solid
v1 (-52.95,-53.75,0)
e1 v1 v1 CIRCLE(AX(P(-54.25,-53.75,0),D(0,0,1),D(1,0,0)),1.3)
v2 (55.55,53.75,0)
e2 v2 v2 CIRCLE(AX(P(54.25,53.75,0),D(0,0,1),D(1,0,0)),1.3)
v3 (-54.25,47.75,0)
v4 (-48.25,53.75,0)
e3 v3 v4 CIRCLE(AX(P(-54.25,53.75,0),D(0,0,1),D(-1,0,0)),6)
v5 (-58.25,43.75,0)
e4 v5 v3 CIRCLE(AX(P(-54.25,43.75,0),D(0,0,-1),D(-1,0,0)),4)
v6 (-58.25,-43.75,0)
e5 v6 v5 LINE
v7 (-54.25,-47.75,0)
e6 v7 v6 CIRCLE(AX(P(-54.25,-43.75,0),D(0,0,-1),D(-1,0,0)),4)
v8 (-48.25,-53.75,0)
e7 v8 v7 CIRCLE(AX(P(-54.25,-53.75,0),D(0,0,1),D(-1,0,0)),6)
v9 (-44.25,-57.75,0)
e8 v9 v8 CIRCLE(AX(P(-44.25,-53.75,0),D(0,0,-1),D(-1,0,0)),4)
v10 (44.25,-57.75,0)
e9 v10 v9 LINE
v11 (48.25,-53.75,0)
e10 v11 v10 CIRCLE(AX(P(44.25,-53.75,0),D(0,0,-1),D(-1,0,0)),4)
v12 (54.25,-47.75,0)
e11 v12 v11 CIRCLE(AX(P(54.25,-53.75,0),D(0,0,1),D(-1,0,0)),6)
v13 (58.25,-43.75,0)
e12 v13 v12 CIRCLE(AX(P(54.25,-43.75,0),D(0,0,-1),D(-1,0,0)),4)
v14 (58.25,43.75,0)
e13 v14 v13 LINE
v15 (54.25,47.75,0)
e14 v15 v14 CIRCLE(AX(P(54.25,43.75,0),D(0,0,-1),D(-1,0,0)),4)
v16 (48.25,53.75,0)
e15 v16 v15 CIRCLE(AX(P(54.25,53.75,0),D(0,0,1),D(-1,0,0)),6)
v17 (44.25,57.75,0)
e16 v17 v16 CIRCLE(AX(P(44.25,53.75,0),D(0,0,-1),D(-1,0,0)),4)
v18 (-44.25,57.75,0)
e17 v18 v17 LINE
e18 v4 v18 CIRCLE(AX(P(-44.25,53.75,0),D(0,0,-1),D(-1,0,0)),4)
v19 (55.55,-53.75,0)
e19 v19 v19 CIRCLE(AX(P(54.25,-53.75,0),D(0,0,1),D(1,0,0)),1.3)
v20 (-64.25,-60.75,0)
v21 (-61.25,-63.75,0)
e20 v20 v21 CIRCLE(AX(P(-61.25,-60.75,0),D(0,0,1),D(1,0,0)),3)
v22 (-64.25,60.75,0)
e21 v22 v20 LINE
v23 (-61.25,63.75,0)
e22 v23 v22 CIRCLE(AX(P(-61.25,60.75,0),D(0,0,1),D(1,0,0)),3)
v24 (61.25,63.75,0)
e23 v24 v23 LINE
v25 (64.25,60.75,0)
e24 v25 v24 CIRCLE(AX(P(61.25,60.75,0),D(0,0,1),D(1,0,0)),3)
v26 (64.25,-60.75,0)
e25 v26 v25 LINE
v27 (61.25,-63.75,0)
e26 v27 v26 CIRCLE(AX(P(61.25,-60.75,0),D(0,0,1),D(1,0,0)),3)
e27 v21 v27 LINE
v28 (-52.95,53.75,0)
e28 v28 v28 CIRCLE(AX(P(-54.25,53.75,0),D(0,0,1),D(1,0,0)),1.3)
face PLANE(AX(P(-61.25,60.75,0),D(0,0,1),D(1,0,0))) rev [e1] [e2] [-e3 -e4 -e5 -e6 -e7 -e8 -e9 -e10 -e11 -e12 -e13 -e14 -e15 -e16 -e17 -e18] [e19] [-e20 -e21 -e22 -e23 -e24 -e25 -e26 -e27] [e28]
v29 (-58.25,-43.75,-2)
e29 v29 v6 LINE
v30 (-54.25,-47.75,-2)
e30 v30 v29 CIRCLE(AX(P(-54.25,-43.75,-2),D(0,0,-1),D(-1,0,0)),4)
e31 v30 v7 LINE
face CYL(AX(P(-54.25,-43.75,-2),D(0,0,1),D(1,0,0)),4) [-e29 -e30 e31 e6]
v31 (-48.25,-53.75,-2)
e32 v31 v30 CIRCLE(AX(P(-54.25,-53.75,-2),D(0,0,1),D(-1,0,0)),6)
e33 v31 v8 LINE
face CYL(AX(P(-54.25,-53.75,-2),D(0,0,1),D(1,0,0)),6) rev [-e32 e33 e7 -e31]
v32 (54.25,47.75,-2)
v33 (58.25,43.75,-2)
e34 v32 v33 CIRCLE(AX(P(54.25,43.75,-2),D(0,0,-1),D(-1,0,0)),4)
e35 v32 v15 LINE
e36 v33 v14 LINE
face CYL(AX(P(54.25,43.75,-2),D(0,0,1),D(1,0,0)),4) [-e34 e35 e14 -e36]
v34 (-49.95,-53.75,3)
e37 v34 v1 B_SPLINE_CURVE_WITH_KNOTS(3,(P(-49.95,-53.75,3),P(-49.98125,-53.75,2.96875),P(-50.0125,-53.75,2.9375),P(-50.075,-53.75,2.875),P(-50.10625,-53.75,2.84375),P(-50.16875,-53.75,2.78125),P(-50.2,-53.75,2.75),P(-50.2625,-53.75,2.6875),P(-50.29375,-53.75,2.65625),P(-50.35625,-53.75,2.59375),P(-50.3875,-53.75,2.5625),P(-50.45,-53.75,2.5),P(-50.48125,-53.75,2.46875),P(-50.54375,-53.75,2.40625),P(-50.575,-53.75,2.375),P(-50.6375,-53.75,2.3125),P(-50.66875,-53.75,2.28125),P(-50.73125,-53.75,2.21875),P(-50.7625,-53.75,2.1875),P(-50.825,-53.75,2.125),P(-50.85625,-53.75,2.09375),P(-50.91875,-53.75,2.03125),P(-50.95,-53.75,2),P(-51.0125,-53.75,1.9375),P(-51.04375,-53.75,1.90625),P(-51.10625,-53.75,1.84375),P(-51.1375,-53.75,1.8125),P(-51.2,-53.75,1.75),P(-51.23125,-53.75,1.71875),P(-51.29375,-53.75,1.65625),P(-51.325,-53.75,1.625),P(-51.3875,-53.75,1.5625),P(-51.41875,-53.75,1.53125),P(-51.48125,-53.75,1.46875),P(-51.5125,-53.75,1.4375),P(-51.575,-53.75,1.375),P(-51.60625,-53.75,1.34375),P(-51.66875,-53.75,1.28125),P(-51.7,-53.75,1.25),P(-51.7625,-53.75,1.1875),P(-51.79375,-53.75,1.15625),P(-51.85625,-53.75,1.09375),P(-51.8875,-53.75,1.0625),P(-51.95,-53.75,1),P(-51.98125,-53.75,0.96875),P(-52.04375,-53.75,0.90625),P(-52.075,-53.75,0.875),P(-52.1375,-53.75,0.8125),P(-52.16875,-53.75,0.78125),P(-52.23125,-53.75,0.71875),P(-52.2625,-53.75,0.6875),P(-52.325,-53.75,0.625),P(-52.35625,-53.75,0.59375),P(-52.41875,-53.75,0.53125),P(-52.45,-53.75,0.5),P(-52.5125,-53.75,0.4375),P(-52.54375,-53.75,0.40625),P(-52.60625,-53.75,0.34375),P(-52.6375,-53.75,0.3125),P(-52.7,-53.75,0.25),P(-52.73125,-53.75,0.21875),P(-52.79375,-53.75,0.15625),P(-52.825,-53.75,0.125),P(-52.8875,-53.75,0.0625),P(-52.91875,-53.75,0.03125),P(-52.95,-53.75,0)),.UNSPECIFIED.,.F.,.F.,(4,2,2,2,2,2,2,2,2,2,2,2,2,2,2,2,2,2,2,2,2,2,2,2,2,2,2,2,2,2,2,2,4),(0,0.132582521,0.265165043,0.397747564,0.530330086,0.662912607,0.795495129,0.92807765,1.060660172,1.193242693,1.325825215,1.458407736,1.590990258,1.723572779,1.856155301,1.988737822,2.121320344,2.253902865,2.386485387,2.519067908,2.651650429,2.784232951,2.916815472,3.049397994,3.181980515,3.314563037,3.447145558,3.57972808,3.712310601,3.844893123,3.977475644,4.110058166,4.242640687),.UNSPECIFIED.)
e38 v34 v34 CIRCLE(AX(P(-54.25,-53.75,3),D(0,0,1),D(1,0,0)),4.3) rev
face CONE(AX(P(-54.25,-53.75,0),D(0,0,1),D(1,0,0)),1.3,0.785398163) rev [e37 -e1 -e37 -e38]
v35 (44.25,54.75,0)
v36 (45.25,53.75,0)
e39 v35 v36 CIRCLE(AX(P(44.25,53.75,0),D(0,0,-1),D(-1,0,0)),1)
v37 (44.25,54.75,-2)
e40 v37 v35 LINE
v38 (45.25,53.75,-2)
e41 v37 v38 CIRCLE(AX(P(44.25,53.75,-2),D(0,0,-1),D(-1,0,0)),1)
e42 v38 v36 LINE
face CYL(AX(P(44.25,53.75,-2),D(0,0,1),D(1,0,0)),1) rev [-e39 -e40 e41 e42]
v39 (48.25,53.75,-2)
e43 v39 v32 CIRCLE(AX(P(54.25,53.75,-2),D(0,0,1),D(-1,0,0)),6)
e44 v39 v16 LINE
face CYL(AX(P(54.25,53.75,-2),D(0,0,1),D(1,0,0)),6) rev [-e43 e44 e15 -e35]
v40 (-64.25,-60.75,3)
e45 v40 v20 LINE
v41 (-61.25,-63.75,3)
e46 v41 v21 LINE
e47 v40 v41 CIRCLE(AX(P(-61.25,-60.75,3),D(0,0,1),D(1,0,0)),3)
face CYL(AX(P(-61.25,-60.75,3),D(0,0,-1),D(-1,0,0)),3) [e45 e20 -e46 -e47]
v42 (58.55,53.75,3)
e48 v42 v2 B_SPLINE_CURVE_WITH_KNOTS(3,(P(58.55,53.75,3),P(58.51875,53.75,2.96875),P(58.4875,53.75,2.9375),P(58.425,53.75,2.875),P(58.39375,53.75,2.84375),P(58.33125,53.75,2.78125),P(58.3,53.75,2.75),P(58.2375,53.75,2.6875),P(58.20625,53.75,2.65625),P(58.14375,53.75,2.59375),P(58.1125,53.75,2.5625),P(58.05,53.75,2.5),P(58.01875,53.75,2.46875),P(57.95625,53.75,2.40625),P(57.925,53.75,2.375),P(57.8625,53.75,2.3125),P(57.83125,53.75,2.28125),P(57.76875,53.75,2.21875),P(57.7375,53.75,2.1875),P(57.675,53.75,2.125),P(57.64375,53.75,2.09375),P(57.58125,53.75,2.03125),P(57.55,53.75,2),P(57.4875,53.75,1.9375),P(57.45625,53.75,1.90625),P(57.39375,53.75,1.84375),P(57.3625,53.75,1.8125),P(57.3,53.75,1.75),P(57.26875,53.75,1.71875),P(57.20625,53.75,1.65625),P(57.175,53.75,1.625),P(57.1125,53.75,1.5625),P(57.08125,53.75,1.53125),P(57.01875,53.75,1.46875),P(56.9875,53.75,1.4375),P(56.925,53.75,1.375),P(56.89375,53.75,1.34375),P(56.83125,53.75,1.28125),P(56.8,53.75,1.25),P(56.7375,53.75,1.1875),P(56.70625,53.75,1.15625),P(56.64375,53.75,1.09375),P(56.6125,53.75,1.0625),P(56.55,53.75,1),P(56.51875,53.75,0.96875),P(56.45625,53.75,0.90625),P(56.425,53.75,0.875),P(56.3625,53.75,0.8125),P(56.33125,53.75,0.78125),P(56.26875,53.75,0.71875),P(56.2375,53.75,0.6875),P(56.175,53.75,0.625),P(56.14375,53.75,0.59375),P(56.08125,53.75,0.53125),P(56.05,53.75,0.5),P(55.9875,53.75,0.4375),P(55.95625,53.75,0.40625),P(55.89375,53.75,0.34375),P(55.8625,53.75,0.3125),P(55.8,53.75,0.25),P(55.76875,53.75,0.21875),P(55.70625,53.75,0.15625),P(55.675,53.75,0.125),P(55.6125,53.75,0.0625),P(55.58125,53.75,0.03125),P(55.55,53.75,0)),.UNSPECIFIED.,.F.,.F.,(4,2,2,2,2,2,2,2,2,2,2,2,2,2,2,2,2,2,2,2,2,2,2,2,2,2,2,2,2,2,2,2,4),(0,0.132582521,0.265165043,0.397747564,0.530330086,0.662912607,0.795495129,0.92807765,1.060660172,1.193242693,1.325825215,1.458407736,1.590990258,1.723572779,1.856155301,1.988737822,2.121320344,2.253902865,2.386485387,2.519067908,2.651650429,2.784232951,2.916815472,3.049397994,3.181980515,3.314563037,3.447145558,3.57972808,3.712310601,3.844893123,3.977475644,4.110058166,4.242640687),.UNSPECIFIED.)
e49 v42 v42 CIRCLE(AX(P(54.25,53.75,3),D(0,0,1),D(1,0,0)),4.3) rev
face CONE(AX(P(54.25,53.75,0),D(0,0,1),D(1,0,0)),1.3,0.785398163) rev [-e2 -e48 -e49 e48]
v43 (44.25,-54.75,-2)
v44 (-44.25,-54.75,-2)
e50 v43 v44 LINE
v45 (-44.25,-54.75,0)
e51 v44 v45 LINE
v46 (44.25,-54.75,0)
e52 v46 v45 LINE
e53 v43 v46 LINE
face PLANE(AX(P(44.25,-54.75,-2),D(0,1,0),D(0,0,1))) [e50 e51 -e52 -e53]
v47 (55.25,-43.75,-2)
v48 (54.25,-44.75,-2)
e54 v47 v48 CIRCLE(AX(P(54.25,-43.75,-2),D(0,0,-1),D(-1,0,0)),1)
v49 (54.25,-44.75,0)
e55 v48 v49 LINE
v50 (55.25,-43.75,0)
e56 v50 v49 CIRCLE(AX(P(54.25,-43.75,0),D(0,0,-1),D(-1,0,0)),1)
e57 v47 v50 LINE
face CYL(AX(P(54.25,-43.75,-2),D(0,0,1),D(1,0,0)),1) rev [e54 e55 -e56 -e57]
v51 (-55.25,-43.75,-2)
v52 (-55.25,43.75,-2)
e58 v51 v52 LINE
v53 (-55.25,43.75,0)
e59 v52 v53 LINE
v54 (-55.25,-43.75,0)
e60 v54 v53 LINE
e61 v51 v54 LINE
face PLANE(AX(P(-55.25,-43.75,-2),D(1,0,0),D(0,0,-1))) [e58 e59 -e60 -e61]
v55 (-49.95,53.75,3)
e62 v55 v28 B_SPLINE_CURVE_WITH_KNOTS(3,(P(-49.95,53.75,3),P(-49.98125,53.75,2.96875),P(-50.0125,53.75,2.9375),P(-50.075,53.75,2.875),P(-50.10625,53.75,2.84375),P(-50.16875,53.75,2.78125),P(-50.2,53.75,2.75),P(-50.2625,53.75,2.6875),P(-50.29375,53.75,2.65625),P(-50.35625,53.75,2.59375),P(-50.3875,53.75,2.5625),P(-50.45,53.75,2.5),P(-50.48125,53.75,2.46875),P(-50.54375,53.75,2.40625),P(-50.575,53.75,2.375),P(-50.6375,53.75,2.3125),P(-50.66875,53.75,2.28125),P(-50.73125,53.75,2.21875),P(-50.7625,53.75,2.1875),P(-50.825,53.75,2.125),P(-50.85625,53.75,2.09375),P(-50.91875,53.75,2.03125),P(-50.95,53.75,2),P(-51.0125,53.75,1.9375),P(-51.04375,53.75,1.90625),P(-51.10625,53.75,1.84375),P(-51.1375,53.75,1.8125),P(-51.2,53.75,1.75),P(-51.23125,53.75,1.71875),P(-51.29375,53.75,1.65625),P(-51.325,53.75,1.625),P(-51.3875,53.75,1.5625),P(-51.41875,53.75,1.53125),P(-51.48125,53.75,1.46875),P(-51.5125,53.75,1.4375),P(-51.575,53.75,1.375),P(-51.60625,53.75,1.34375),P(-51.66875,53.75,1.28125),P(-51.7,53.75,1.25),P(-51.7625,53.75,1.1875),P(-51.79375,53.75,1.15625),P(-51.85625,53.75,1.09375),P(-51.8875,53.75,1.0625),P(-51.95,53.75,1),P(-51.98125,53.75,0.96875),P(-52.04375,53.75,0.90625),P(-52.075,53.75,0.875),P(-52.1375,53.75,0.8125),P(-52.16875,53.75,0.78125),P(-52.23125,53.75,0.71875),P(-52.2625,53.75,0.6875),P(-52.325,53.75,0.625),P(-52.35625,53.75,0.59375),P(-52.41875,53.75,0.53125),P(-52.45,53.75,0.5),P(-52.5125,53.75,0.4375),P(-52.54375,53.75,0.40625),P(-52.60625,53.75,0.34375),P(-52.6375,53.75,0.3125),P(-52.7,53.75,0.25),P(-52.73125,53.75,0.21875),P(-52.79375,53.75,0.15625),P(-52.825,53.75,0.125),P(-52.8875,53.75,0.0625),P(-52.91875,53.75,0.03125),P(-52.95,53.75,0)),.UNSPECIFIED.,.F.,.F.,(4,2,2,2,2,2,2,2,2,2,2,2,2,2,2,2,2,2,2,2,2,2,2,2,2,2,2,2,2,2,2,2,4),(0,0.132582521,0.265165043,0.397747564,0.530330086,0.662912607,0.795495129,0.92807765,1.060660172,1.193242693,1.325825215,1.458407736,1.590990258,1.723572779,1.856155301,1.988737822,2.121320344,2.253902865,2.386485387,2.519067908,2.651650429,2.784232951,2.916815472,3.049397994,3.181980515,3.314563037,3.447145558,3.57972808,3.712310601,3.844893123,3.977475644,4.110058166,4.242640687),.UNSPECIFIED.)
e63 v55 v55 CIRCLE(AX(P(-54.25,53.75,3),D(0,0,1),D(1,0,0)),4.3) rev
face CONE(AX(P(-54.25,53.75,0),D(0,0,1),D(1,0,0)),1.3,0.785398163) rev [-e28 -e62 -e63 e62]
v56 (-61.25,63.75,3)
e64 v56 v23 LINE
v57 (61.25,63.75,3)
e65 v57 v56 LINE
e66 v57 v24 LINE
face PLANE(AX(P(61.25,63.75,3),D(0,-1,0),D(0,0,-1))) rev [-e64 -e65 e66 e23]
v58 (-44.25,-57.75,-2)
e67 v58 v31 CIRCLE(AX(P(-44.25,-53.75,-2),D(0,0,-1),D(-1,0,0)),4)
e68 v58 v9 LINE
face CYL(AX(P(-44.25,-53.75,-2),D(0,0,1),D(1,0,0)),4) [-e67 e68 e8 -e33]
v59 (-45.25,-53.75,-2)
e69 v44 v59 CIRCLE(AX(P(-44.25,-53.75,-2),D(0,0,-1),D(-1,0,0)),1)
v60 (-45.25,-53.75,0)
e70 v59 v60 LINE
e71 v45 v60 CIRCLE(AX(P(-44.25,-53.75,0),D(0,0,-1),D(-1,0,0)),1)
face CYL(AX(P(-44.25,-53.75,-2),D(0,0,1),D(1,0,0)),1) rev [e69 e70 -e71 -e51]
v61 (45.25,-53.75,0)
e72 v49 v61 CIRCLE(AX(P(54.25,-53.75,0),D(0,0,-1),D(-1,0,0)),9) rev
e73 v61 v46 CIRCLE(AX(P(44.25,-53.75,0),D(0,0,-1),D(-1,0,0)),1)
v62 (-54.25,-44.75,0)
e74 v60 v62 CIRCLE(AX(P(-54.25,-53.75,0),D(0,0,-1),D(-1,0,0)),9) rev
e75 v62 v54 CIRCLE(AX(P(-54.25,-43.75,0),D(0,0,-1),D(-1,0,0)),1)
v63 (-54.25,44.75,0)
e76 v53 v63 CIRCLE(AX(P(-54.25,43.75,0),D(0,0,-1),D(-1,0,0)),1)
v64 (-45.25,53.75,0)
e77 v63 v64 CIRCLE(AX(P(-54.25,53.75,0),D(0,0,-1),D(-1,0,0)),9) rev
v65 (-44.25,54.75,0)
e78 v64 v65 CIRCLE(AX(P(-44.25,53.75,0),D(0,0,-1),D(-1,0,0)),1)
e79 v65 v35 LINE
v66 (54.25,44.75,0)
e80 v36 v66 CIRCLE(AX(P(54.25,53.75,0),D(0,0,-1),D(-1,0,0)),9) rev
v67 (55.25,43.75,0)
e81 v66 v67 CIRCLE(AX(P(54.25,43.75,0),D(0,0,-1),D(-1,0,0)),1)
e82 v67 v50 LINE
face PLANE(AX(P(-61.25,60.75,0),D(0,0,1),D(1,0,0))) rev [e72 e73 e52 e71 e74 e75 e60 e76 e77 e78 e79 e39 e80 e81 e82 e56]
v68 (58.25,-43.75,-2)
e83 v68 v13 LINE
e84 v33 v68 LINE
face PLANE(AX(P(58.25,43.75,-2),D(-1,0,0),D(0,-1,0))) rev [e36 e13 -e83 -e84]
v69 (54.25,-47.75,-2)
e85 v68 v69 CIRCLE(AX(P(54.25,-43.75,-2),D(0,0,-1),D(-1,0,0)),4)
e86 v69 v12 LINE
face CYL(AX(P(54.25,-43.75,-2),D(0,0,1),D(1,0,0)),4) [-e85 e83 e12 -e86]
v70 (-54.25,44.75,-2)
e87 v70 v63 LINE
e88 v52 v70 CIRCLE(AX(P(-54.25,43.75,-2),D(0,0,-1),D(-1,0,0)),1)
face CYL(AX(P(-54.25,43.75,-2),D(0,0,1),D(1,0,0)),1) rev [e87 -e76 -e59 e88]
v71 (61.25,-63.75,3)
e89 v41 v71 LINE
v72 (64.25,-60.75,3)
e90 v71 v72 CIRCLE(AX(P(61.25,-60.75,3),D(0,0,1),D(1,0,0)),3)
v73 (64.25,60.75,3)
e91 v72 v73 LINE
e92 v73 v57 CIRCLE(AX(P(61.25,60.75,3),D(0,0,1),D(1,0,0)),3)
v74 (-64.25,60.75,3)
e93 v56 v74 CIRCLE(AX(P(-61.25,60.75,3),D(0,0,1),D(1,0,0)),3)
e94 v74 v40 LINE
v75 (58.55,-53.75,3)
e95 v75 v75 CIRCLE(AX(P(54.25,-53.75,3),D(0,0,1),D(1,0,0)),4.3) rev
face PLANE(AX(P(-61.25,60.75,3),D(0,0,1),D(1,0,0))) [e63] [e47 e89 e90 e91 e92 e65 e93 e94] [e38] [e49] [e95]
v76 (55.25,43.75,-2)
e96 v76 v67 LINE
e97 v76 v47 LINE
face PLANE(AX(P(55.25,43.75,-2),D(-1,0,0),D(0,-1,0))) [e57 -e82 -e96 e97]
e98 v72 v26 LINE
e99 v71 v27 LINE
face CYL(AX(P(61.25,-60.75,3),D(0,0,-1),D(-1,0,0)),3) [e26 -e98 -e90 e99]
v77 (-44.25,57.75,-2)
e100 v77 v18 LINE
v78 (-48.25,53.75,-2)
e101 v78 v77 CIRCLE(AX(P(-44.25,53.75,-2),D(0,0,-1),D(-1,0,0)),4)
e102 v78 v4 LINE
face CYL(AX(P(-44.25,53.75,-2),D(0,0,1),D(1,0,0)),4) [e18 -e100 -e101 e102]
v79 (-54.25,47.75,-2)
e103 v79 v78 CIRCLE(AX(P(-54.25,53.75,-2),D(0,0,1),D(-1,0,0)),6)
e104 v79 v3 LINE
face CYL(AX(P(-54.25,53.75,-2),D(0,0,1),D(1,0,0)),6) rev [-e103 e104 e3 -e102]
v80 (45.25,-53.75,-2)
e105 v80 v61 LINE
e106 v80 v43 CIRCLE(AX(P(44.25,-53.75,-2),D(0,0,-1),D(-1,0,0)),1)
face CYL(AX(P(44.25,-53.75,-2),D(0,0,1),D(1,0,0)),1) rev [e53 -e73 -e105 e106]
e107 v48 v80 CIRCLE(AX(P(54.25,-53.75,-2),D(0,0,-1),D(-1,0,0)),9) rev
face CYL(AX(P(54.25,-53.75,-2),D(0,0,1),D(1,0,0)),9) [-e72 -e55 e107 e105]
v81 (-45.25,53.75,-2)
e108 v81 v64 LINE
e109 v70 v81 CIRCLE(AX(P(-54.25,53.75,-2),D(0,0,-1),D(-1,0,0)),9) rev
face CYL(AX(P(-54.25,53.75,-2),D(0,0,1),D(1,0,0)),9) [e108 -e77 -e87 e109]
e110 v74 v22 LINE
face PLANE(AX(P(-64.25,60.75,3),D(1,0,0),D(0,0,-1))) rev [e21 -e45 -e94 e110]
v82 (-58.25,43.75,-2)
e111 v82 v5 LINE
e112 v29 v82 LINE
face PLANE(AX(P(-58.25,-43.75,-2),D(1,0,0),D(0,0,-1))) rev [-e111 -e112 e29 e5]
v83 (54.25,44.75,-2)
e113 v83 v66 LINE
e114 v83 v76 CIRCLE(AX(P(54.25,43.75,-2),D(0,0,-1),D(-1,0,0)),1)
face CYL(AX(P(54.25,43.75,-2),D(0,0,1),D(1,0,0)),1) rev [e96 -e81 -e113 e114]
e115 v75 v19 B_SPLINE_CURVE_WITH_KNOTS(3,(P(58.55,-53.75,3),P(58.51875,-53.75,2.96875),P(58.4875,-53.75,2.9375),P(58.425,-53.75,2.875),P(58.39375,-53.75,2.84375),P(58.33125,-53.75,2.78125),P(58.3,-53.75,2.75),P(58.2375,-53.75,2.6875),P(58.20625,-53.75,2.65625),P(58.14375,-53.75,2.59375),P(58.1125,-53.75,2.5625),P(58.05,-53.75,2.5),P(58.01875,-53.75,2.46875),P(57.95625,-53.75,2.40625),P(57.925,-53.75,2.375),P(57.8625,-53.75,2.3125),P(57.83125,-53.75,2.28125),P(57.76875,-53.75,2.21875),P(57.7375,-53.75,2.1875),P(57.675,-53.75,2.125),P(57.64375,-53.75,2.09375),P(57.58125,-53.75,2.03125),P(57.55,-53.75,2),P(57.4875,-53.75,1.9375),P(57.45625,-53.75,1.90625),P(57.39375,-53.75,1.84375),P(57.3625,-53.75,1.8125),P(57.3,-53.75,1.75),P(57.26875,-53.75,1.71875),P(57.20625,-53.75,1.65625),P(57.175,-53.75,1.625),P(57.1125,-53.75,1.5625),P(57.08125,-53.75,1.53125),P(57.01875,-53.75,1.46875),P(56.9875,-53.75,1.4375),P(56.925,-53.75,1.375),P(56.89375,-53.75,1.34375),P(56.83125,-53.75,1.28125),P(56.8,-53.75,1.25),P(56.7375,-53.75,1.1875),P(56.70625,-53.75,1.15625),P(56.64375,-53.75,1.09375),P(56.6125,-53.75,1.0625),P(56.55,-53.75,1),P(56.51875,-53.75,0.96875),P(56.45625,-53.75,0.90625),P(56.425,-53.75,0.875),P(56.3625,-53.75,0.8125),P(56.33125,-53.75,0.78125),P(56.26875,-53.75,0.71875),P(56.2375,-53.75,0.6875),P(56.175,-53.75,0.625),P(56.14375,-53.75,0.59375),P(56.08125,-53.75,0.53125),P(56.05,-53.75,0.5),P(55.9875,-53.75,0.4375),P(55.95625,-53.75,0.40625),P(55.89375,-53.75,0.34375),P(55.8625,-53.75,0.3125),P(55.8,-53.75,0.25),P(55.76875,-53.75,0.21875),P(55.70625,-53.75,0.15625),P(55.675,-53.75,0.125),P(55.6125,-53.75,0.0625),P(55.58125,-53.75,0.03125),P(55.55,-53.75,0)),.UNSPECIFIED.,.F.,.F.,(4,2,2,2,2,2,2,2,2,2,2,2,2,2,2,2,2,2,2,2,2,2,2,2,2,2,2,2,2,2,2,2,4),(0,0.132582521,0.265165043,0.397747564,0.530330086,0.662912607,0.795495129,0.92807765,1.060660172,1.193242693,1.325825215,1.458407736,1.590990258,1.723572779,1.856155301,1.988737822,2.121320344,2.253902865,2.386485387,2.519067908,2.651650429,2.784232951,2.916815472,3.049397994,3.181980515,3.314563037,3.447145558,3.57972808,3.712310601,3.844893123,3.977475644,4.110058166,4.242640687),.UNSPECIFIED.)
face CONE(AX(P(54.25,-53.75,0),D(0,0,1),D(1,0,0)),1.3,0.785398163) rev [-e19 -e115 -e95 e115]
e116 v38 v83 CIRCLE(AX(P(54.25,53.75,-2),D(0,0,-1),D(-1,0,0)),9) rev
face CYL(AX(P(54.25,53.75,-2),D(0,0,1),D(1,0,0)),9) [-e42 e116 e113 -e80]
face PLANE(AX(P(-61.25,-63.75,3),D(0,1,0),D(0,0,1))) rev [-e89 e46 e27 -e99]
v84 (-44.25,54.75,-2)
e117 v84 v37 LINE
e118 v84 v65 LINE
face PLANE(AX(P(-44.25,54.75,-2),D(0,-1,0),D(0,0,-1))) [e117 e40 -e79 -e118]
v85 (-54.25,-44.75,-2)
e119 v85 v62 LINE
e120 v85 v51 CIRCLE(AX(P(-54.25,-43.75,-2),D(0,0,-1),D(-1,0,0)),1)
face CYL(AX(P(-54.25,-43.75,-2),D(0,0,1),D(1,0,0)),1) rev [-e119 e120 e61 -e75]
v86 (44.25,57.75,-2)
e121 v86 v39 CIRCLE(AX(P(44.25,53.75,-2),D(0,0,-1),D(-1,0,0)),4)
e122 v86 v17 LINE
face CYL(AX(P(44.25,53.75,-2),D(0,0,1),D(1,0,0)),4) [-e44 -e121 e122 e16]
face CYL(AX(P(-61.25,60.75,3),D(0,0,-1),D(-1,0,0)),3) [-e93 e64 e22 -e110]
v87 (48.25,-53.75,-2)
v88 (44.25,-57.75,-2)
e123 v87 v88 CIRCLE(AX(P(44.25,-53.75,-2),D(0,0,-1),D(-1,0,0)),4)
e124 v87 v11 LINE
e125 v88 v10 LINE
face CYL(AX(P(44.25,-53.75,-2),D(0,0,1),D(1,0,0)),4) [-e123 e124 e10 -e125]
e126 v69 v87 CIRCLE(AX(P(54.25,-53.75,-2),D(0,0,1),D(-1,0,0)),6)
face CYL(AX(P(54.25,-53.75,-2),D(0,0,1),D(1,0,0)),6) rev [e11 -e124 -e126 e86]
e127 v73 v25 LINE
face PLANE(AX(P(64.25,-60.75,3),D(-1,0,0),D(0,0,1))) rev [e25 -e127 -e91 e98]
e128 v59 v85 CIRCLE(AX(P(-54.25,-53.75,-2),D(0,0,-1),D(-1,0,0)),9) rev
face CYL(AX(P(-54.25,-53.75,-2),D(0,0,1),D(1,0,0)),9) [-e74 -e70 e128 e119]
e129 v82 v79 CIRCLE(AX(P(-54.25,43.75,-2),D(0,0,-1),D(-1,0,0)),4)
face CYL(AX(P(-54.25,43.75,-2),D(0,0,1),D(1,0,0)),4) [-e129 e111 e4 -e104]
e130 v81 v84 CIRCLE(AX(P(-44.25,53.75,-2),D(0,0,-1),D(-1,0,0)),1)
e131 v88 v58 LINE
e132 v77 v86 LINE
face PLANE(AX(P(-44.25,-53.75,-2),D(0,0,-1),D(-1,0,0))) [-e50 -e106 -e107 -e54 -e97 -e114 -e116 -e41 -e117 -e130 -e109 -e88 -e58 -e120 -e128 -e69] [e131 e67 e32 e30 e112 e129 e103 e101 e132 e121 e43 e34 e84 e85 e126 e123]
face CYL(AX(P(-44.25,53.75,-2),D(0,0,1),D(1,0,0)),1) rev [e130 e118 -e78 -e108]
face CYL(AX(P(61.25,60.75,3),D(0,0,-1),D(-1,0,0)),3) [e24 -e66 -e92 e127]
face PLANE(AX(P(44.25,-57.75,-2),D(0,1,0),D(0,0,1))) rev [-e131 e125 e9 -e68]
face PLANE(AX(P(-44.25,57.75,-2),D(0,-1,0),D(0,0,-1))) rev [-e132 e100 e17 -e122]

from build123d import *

# Parameters (mm, degrees)
EXTRUDE_1_DEPTH     = 3
EXTRUDE_1_2_DEPTH   = 2
SKETCH_3_R          = 1.3
CUT_EXTRUDE_1_DEPTH = 5
CHAMFER_1_SIZE      = 3


with BuildPart() as part:
    # Эскиз1 → Extrude 1 (new body)
    with BuildSketch(Plane.XY):
        with BuildLine():
            Line((-64.25, 60.75), (-64.25, -60.75))
            ThreePointArc((-64.25, -60.75), (-63.371320344, -62.871320344), (-61.25, -63.75))
            Line((-61.25, -63.75), (61.25, -63.75))
            ThreePointArc((61.25, -63.75), (63.371320344, -62.871320344), (64.25, -60.75))
            Line((64.25, -60.75), (64.25, 60.75))
            ThreePointArc((64.25, 60.75), (63.371320344, 62.871320344), (61.25, 63.75))
            Line((61.25, 63.75), (-61.25, 63.75))
            ThreePointArc((-61.25, 63.75), (-63.371320344, 62.871320344), (-64.25, 60.75))
        make_face()
    extrude(amount=EXTRUDE_1_DEPTH)

    # Эскиз2 → Extrude 1 2 (add)
    with BuildSketch(Plane(origin=(0, 0, 0), x_dir=(-1, 0, 0), z_dir=(0, 0, -1))):
        with BuildLine():
            Line((-44.25, -57.75), (44.25, -57.75))
            ThreePointArc((44.25, -57.75), (47.078427125, -56.578427125), (48.25, -53.75))
            ThreePointArc((48.25, -53.75), (50.007359313, -49.507359313), (54.25, -47.75))
            ThreePointArc((54.25, -47.75), (57.078427125, -46.578427125), (58.25, -43.75))
            Line((58.25, -43.75), (58.25, 43.75))
            ThreePointArc((58.25, 43.75), (57.078427125, 46.578427125), (54.25, 47.75))
            ThreePointArc((54.25, 47.75), (50.007359313, 49.507359313), (48.25, 53.75))
            ThreePointArc((48.25, 53.75), (47.078427125, 56.578427125), (44.25, 57.75))
            Line((44.25, 57.75), (-44.25, 57.75))
            ThreePointArc((-44.25, 57.75), (-47.078427125, 56.578427125), (-48.25, 53.75))
            ThreePointArc((-48.25, 53.75), (-50.007359313, 49.507359313), (-54.25, 47.75))
            ThreePointArc((-54.25, 47.75), (-57.078427125, 46.578427125), (-58.25, 43.75))
            Line((-58.25, 43.75), (-58.25, -43.75))
            ThreePointArc((-58.25, -43.75), (-57.078427125, -46.578427125), (-54.25, -47.75))
            ThreePointArc((-54.25, -47.75), (-50.007359313, -49.507359313), (-48.25, -53.75))
            ThreePointArc((-48.25, -53.75), (-47.078427125, -56.578427125), (-44.25, -57.75))
        make_face()
        with BuildLine():
            Line((-44.25, -54.75), (44.25, -54.75))
            ThreePointArc((44.25, -54.75), (44.957106781, -54.457106781), (45.25, -53.75))
            ThreePointArc((45.25, -53.75), (47.886038969, -47.386038969), (54.25, -44.75))
            ThreePointArc((54.25, -44.75), (54.957106781, -44.457106781), (55.25, -43.75))
            Line((55.25, -43.75), (55.25, 43.75))
            ThreePointArc((55.25, 43.75), (54.957106781, 44.457106781), (54.25, 44.75))
            ThreePointArc((54.25, 44.75), (47.886038969, 47.386038969), (45.25, 53.75))
            ThreePointArc((45.25, 53.75), (44.957106781, 54.457106781), (44.25, 54.75))
            Line((44.25, 54.75), (-44.25, 54.75))
            ThreePointArc((-44.25, 54.75), (-44.957106781, 54.457106781), (-45.25, 53.75))
            ThreePointArc((-45.25, 53.75), (-47.886038969, 47.386038969), (-54.25, 44.75))
            ThreePointArc((-54.25, 44.75), (-54.957106781, 44.457106781), (-55.25, 43.75))
            Line((-55.25, 43.75), (-55.25, -43.75))
            ThreePointArc((-55.25, -43.75), (-54.957106781, -44.457106781), (-54.25, -44.75))
            ThreePointArc((-54.25, -44.75), (-47.886038969, -47.386038969), (-45.25, -53.75))
            ThreePointArc((-45.25, -53.75), (-44.957106781, -54.457106781), (-44.25, -54.75))
        make_face(mode=Mode.SUBTRACT)
    extrude(amount=EXTRUDE_1_2_DEPTH)

    # Эскиз3 → Вырез-Вытянуть1 (cut)
    with BuildSketch(Plane.XY.offset(3)):
        with Locations((54.25, -53.75)):
            Circle(SKETCH_3_R)
        with Locations((54.25, 53.75)):
            Circle(SKETCH_3_R)
        with Locations((-54.25, 53.75)):
            Circle(SKETCH_3_R)
        with Locations((-54.25, -53.75)):
            Circle(SKETCH_3_R)
    extrude(amount=-CUT_EXTRUDE_1_DEPTH, mode=Mode.SUBTRACT)

    # Фаска1
    chamfer_1_edges = [part.edges().sort_by_distance(p)[0] for p in [
        (-55.55, -53.75, 3),
        (-55.55, 53.75, 3),
        (52.95, 53.75, 3),
        (52.95, -53.75, 3),
    ]]
    chamfer(chamfer_1_edges, length=CHAMFER_1_SIZE - 0.0001)  # a hair under: the kernel refuses the full size


solid = part.part
